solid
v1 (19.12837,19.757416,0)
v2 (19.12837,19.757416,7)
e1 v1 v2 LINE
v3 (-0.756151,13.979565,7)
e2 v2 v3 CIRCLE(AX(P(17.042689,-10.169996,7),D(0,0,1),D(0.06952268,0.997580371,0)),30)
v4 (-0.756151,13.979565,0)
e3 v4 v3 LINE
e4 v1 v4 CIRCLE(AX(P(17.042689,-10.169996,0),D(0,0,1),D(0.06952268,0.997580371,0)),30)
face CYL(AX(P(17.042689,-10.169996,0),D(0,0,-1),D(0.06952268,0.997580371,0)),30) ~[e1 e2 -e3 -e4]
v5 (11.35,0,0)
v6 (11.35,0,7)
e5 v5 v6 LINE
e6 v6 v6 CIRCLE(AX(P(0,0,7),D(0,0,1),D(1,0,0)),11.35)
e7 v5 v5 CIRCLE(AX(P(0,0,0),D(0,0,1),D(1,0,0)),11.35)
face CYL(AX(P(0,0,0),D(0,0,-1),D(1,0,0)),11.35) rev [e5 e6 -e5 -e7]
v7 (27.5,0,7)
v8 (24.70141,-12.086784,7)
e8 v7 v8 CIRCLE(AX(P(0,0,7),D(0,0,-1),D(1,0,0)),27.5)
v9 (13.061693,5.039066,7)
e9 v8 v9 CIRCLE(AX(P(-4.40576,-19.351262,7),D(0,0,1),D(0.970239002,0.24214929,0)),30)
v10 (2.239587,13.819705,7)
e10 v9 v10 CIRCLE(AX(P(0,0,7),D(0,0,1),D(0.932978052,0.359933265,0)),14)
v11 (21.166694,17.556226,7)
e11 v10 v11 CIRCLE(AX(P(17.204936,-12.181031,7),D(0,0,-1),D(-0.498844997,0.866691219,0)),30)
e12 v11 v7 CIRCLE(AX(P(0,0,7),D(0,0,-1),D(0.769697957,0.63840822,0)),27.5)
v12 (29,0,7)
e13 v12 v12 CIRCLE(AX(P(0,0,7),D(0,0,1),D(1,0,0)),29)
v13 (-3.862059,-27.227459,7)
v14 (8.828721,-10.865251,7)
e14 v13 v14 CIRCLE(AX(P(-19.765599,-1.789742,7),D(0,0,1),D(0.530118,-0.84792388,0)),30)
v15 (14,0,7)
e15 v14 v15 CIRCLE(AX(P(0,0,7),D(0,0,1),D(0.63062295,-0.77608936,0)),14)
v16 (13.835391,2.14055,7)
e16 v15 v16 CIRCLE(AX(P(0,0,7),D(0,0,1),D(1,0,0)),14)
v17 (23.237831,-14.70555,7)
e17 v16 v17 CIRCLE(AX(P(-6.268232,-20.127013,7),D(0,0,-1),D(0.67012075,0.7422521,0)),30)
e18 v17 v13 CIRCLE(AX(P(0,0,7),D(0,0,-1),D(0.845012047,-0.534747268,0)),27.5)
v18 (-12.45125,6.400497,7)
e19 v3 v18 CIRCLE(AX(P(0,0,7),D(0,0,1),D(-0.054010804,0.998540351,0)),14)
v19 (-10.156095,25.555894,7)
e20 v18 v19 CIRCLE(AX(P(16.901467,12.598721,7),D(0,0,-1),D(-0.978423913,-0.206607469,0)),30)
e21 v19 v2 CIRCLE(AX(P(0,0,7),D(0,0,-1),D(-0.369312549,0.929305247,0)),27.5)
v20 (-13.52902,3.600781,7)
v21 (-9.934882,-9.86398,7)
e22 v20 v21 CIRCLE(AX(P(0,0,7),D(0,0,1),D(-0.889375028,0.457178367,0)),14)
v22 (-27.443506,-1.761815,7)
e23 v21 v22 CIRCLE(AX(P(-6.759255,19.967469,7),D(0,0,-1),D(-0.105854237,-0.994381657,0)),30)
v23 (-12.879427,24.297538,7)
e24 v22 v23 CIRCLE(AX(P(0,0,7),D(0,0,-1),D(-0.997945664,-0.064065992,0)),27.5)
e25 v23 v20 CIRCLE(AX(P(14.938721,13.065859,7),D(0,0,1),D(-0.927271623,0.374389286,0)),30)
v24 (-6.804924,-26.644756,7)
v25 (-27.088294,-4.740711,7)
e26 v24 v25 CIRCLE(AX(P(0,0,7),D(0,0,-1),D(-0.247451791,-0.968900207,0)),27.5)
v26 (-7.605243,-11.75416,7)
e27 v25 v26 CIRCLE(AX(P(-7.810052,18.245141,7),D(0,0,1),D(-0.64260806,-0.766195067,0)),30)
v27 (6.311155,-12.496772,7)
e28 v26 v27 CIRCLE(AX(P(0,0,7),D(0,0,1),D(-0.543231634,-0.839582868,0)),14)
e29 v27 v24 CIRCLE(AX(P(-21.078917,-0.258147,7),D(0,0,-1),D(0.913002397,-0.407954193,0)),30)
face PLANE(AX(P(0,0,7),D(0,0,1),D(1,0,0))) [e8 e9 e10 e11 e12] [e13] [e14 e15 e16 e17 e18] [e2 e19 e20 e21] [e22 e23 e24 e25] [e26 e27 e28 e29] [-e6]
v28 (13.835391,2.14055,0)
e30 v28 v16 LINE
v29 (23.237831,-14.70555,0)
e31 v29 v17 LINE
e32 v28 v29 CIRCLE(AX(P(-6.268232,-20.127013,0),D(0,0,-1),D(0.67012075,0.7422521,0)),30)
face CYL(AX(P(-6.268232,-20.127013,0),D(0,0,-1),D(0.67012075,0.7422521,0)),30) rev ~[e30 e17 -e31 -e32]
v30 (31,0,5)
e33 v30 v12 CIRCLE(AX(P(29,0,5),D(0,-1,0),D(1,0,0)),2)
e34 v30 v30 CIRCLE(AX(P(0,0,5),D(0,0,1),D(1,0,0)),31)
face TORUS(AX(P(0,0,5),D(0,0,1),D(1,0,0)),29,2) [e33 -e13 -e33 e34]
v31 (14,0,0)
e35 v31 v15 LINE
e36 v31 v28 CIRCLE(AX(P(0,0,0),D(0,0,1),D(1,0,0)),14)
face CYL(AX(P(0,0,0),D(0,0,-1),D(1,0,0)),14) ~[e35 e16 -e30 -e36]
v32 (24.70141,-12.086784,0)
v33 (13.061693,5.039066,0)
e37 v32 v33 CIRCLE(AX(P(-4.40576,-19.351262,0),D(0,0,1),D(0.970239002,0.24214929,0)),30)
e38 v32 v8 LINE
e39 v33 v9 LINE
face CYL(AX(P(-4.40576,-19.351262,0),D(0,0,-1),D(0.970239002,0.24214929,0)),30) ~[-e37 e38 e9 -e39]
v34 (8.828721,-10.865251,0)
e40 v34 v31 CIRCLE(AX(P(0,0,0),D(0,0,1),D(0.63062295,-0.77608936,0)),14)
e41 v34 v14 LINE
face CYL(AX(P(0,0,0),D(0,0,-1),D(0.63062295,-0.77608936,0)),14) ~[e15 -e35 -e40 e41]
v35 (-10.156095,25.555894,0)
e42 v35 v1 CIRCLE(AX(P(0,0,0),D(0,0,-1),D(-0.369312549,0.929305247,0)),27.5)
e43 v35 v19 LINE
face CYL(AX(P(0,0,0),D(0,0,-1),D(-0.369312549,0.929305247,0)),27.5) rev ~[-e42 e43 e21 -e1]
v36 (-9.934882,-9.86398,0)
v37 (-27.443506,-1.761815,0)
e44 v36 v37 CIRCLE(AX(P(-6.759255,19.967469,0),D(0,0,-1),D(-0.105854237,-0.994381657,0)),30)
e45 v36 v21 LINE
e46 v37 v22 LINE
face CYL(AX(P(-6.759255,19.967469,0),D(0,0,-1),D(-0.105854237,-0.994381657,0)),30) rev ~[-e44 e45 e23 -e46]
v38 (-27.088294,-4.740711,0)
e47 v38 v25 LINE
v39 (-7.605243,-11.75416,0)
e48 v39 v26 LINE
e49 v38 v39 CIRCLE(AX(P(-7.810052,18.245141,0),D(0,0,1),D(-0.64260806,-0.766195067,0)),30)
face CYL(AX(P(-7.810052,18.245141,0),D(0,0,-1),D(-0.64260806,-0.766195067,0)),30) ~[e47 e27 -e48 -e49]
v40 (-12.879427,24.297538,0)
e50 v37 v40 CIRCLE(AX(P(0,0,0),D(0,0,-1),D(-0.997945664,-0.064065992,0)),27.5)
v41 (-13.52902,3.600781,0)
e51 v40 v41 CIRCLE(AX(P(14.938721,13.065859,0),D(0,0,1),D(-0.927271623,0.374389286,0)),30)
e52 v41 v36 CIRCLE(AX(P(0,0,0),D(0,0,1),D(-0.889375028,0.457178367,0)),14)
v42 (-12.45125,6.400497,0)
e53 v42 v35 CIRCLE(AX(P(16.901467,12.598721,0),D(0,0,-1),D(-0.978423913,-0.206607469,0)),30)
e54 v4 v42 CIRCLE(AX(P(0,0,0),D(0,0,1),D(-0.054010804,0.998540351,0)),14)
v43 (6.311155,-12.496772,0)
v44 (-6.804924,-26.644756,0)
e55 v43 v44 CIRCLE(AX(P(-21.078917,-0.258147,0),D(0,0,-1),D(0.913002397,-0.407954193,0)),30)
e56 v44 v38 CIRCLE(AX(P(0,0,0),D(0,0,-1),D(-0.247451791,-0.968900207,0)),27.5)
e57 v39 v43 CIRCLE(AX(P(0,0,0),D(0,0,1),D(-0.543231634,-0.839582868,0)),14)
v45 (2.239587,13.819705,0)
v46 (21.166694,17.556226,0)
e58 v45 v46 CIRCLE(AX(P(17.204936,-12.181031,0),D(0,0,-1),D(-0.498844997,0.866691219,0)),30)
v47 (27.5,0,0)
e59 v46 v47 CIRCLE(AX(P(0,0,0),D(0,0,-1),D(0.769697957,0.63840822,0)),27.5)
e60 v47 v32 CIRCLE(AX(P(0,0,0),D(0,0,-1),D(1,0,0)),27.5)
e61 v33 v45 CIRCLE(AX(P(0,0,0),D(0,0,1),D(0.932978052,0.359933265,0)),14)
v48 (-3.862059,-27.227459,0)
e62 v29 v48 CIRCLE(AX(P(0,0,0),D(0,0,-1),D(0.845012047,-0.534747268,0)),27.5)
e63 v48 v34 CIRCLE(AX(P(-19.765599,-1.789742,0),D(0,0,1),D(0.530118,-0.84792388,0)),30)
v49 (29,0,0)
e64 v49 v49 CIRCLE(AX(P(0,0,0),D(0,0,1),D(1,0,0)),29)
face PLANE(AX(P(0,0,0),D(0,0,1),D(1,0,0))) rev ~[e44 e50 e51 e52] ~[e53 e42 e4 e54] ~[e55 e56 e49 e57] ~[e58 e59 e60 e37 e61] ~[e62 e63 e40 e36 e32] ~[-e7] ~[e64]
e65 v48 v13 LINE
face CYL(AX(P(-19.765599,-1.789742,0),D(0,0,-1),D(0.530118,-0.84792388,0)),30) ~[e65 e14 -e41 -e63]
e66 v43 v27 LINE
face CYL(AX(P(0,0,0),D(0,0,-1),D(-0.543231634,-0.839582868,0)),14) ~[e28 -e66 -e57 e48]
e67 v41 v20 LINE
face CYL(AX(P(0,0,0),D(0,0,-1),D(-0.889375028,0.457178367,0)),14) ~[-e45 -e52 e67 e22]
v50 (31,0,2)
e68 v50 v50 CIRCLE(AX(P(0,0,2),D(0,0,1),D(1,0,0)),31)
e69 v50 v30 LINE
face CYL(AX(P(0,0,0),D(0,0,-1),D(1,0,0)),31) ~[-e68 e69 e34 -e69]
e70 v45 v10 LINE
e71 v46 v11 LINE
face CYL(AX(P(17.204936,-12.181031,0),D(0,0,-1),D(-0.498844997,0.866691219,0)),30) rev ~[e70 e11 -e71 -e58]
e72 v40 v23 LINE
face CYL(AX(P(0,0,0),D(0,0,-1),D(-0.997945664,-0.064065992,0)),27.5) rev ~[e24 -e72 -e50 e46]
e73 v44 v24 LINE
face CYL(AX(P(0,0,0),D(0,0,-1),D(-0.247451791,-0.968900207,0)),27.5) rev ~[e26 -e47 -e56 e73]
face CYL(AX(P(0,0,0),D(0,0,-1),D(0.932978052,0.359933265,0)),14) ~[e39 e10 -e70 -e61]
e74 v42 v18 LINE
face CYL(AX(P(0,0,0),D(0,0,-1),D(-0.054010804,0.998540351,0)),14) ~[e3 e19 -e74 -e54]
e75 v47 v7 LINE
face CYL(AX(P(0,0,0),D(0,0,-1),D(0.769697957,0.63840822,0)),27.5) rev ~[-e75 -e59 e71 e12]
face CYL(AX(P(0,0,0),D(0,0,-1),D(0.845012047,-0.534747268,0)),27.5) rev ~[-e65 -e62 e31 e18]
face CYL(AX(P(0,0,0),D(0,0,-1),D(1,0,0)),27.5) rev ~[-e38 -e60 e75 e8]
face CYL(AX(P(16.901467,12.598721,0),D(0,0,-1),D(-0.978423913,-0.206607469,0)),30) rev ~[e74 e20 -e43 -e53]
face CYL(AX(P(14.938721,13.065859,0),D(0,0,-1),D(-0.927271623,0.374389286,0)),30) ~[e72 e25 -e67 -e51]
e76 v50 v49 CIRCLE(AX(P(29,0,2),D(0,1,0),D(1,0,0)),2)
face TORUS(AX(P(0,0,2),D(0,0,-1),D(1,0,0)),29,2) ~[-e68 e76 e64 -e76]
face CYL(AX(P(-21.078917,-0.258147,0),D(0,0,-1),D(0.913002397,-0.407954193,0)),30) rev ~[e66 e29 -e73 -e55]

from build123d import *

# Parameters (mm, degrees)
F0_R     = 31
F0_R_2   = 11.35
F1_DEPTH = 7
F2_R     = 2


# Not quite as in the source:
# - a feature names something its author has since deleted; it is built from what else it names


with BuildPart() as f1:
    # F0 (on Top) → F1 (new body)
    with BuildSketch(Plane.XY):
        Circle(F0_R)
        with BuildLine():
            ThreePointArc((21.1666938057, 17.5562260562), (25.8682631776, 9.3318251254), (27.5, 0))
            ThreePointArc((27.5, 0), (26.7912185144, -6.2032741767), (24.7014101446, -12.0867835617))
            ThreePointArc((24.7014101446, -12.0867835617), (24.0053577694, -13.4161394731), (23.237831293, -14.7055498639))
            ThreePointArc((23.237831293, -14.7055498639), (11.5349334666, -24.9638801055), (-3.8620587477, -27.2274586076))
            ThreePointArc((-3.8620587477, -27.2274586076), (-5.3414433626, -26.9762670287), (-6.8049242418, -26.6447556953))
            ThreePointArc((-6.8049242418, -26.6447556953), (-20.1775703762, -18.6846368365), (-27.0882937172, -4.740711285))
            ThreePointArc((-27.0882937172, -4.740711285), (-27.3065513165, -3.2561104403), (-27.4435057653, -1.7618147778))
            ThreePointArc((-27.4435057653, -1.7618147778), (-24.0053577694, 13.4161394731), (-12.8794274668, 24.2975379026))
            ThreePointArc((-12.8794274668, 24.2975379026), (-11.5349334666, 24.9638801055), (-10.1560950916, 25.5558942808))
            ThreePointArc((-10.1560950916, 25.5558942808), (5.3414433626, 26.9762670287), (19.1283697872, 19.7574155518))
            ThreePointArc((19.1283697872, 19.7574155518), (20.1775703762, 18.6846368365), (21.1666938057, 17.5562260562))
        make_face(mode=Mode.SUBTRACT)
        with BuildLine():
            ThreePointArc((13.0616927236, 5.0390657066), (8.8208386376, 10.871651472), (2.2395865353, 13.8197052122))
            ThreePointArc((2.2395865353, 13.8197052122), (0.7460119592, 13.9801096618), (-0.7561512494, 13.9795649177))
            ThreePointArc((-0.7561512494, 13.9795649177), (-7.6137659317, 11.7486411273), (-12.4512503955, 6.400497136))
            ThreePointArc((-12.4512503955, 6.400497136), (-13.065344019, 5.0295910037), (-13.5290198963, 3.6007805605))
            ThreePointArc((-13.5290198963, 3.6007805605), (-13.5264047658, -3.6105919337), (-9.9348824822, -9.8639804372))
            ThreePointArc((-9.9348824822, -9.8639804372), (-8.8208386376, -10.871651472), (-7.605242881, -11.7541601453))
            ThreePointArc((-7.605242881, -11.7541601453), (-0.7460119592, -13.9801096618), (6.3111553473, -12.4967723106))
            ThreePointArc((6.3111553473, -12.4967723106), (7.6137659317, -11.7486411273), (8.8287213032, -10.8652510395))
            ThreePointArc((8.8287213032, -10.8652510395), (12.6412439705, -6.016556397), (14, 0))
            ThreePointArc((14, 0), (13.9587870879, 1.0734351561), (13.8353909951, 2.1405503996))
            ThreePointArc((13.8353909951, 2.1405503996), (13.5264047658, 3.6105919337), (13.0616927236, 5.0390657066))
        make_face()
        Circle(F0_R_2, mode=Mode.SUBTRACT)
        with BuildLine():
            ThreePointArc((2.2395865353, 13.8197052122), (11.3945871221, 17.2509213593), (21.1666938057, 17.5562260562))
            ThreePointArc((21.1666938057, 17.5562260562), (20.1775703762, 18.6846368365), (19.1283697872, 19.7574155518))
            ThreePointArc((19.1283697872, 19.7574155518), (8.6718028957, 18.6384798978), (-0.7561512494, 13.9795649177))
            ThreePointArc((-0.7561512494, 13.9795649177), (0.7460119592, 13.9801096618), (2.2395865353, 13.8197052122))
        make_face()
        with BuildLine():
            ThreePointArc((-12.4512503955, 6.400497136), (-12.8854801062, 16.1677242016), (-10.1560950916, 25.5558942808))
            ThreePointArc((-10.1560950916, 25.5558942808), (-11.5349334666, 24.9638801055), (-12.8794274668, 24.2975379026))
            ThreePointArc((-12.8794274668, 24.2975379026), (-15.046513294, 14.0069816897), (-13.5290198963, 3.6007805605))
            ThreePointArc((-13.5290198963, 3.6007805605), (-13.065344019, 5.0295910037), (-12.4512503955, 6.400497136))
        make_face()
        with BuildLine():
            ThreePointArc((-9.9348824822, -9.8639804372), (-19.3582517891, -7.258718282), (-27.4435057653, -1.7618147778))
            ThreePointArc((-27.4435057653, -1.7618147778), (-27.3065513165, -3.2561104403), (-27.0882937172, -4.740711285))
            ThreePointArc((-27.0882937172, -4.740711285), (-17.9710595236, -9.9816891338), (-7.605242881, -11.7541601453))
            ThreePointArc((-7.605242881, -11.7541601453), (-8.8208386376, -10.871651472), (-9.9348824822, -9.8639804372))
        make_face()
        with BuildLine():
            ThreePointArc((-6.8049242418, -26.6447556953), (-5.3414433626, -26.9762670287), (-3.8620587477, -27.2274586076))
            ThreePointArc((-3.8620587477, -27.2274586076), (3.9397876946, -20.1760048395), (8.8287213032, -10.8652510395))
            ThreePointArc((8.8287213032, -10.8652510395), (7.6137659317, -11.7486411273), (6.3111553473, -12.4967723106))
            ThreePointArc((6.3111553473, -12.4967723106), (0.9214225378, -20.6538588146), (-6.8049242418, -26.6447556953))
        make_face()
        with BuildLine():
            ThreePointArc((23.237831293, -14.7055498639), (24.0053577694, -13.4161394731), (24.7014101446, -12.0867835617))
            ThreePointArc((24.7014101446, -12.0867835617), (20.4059822273, -2.4877676142), (13.0616927236, 5.0390657066))
            ThreePointArc((13.0616927236, 5.0390657066), (13.5264047658, 3.6105919337), (13.8353909951, 2.1405503996))
            ThreePointArc((13.8353909951, 2.1405503996), (19.9277222355, -5.5060684643), (23.237831293, -14.7055498639))
        make_face()
    extrude(amount=F1_DEPTH)

    # F2
    f2_edges = [f1.edges().sort_by_distance(p)[0] for p in [
        (-31, 0, 7),
        (-31, 0, 0),
    ]]
    fillet(f2_edges, radius=F2_R)


solid = f1.part
